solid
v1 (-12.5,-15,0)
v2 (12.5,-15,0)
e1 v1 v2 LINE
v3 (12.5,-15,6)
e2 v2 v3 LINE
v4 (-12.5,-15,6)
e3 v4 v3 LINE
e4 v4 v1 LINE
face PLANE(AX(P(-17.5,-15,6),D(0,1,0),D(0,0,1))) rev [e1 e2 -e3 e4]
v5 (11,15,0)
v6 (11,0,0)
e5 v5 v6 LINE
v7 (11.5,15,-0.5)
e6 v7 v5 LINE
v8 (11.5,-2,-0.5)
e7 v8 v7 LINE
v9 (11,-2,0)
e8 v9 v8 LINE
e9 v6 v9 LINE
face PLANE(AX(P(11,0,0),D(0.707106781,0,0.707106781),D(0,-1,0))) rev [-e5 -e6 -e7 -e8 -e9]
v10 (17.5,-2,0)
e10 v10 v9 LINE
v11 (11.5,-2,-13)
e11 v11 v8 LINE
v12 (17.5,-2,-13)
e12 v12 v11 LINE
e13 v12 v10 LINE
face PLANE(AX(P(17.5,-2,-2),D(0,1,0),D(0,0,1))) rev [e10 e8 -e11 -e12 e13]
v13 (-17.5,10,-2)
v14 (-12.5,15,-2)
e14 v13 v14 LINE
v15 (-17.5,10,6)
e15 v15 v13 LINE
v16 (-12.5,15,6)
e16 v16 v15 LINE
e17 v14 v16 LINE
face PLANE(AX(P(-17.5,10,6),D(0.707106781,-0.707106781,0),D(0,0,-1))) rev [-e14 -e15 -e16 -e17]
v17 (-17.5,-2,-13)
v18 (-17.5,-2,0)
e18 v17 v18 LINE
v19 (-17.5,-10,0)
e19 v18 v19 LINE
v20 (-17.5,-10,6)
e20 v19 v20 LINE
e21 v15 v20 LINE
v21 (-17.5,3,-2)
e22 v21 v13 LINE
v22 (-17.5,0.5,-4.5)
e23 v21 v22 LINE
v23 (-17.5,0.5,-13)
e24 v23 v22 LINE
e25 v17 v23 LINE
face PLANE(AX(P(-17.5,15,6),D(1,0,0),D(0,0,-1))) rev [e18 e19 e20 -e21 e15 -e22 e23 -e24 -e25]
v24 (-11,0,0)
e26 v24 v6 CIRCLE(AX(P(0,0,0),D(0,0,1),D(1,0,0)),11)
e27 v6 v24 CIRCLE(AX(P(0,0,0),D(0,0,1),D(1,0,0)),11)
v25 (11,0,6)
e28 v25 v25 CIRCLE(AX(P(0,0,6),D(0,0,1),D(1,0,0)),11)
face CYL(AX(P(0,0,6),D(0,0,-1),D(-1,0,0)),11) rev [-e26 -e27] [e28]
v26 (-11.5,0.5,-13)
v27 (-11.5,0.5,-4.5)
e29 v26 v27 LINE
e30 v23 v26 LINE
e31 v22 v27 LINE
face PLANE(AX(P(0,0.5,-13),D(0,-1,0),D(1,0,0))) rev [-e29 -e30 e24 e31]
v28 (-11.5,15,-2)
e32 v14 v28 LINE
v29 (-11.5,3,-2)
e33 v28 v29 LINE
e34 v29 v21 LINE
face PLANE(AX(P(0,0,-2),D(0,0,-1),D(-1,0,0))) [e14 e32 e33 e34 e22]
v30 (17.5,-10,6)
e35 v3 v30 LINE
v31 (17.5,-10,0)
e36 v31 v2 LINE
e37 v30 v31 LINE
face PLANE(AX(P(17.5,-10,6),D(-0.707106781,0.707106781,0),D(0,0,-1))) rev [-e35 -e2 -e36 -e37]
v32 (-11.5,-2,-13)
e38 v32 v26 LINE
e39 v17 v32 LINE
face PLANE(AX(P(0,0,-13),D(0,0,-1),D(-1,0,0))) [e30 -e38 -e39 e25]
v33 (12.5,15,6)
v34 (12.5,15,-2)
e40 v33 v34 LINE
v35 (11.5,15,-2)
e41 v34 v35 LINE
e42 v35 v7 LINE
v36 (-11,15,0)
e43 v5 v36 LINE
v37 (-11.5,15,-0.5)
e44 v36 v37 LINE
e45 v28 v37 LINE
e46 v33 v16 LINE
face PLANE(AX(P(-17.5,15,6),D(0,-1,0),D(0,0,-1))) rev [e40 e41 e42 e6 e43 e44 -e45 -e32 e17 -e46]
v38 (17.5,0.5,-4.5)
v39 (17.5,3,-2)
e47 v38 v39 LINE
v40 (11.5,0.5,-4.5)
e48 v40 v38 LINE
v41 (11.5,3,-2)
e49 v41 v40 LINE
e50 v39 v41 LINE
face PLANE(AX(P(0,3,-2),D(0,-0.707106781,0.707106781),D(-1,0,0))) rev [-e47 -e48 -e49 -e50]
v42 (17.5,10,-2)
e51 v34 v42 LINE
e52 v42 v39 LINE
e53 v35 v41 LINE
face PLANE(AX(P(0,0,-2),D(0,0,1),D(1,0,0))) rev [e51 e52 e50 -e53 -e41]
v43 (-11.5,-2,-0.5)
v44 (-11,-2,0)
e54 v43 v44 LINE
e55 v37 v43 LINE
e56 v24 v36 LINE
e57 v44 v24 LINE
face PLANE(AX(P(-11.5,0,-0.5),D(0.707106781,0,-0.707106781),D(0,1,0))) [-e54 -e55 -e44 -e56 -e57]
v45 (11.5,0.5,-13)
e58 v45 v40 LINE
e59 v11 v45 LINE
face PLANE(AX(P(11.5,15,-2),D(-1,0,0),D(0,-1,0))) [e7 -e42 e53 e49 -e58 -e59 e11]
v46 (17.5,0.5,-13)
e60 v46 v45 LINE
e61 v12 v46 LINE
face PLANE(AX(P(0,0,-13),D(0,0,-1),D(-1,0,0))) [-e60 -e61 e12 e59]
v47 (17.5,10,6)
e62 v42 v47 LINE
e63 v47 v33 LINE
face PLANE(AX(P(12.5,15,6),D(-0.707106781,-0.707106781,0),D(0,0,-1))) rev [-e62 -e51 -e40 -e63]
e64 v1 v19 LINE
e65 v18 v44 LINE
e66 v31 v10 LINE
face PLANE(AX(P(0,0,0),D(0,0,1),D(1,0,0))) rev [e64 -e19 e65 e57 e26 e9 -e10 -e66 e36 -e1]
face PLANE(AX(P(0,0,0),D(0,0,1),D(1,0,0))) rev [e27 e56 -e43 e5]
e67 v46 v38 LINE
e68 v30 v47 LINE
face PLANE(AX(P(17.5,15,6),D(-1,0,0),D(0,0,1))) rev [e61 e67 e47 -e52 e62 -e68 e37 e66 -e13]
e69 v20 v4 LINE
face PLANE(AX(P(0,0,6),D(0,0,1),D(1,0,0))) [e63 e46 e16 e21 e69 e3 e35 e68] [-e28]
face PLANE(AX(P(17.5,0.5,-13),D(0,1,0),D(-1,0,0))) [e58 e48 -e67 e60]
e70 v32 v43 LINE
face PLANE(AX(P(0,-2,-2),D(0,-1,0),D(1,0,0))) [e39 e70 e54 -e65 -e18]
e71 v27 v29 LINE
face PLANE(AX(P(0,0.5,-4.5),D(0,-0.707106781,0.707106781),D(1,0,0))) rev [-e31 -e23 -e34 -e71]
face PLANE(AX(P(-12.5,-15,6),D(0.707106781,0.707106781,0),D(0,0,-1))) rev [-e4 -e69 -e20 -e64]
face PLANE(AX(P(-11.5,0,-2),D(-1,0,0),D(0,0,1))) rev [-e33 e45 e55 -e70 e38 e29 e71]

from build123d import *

# Parameters (mm, degrees)
SKETCH1_W           = 35
SKETCH1_H           = 30
SKETCH1_R           = 11
BOSS_EXTRUDE1_DEPTH = 6
SKETCH2_W           = 6
SKETCH2_H           = 17
BOSS_EXTRUDE2_DEPTH = 2
SKETCH3_W           = 6
SKETCH3_H           = 2.5
BOSS_EXTRUDE3_DEPTH = 11
CHAMFER1_SIZE       = 5
CHAMFER2_SIZE       = 2.5
CHAMFER3_SIZE       = 0.5


with BuildPart() as part:
    # Sketch1 → Boss-Extrude1 (new body)
    with BuildSketch(Plane.XY):
        Rectangle(SKETCH1_W, SKETCH1_H)
        Circle(SKETCH1_R, mode=Mode.SUBTRACT)
    extrude(amount=BOSS_EXTRUDE1_DEPTH)

    # Sketch2 → Boss-Extrude2 (add)
    with BuildSketch(Plane(origin=(0, 0, 0), x_dir=(-1, 0, 0), z_dir=(0, 0, -1))):
        with Locations((14.5, 6.5)):
            Rectangle(SKETCH2_W, SKETCH2_H)
        with Locations((-14.5, 6.5)):
            Rectangle(SKETCH2_W, SKETCH2_H)
    extrude(amount=BOSS_EXTRUDE2_DEPTH)

    # Sketch3 → Boss-Extrude3 (add)
    with BuildSketch(Plane(origin=(0, 0, -2), x_dir=(-1, 0, 0), z_dir=(0, 0, -1))):
        with Locations((14.5, -0.75)):
            Rectangle(SKETCH3_W, SKETCH3_H)
        with Locations((-14.5, -0.75)):
            Rectangle(SKETCH3_W, SKETCH3_H)
    extrude(amount=BOSS_EXTRUDE3_DEPTH)

    # Chamfer1
    chamfer1_edges = [part.edges().sort_by_distance(p)[0] for p in [
        (17.5, -15, 3),
        (-17.5, -15, 3),
        (-17.5, 15, 2),
        (17.5, 15, 2),
    ]]
    chamfer(chamfer1_edges, length=CHAMFER1_SIZE)

    # Chamfer2
    chamfer2_edges = [part.edges().sort_by_distance(p)[0] for p in [
        (-14.5, 0.5, -2),
        (14.5, 0.5, -2),
    ]]
    chamfer(chamfer2_edges, length=CHAMFER2_SIZE)

    # Chamfer3
    chamfer3_edges = [part.edges().sort_by_distance(p)[0] for p in [
        (-11.5, 6.5, 0),
        (11.5, 6.5, 0),
    ]]
    chamfer(chamfer3_edges, length=CHAMFER3_SIZE - 0.0001)  # a hair under: the kernel refuses the full size


solid = part.part
